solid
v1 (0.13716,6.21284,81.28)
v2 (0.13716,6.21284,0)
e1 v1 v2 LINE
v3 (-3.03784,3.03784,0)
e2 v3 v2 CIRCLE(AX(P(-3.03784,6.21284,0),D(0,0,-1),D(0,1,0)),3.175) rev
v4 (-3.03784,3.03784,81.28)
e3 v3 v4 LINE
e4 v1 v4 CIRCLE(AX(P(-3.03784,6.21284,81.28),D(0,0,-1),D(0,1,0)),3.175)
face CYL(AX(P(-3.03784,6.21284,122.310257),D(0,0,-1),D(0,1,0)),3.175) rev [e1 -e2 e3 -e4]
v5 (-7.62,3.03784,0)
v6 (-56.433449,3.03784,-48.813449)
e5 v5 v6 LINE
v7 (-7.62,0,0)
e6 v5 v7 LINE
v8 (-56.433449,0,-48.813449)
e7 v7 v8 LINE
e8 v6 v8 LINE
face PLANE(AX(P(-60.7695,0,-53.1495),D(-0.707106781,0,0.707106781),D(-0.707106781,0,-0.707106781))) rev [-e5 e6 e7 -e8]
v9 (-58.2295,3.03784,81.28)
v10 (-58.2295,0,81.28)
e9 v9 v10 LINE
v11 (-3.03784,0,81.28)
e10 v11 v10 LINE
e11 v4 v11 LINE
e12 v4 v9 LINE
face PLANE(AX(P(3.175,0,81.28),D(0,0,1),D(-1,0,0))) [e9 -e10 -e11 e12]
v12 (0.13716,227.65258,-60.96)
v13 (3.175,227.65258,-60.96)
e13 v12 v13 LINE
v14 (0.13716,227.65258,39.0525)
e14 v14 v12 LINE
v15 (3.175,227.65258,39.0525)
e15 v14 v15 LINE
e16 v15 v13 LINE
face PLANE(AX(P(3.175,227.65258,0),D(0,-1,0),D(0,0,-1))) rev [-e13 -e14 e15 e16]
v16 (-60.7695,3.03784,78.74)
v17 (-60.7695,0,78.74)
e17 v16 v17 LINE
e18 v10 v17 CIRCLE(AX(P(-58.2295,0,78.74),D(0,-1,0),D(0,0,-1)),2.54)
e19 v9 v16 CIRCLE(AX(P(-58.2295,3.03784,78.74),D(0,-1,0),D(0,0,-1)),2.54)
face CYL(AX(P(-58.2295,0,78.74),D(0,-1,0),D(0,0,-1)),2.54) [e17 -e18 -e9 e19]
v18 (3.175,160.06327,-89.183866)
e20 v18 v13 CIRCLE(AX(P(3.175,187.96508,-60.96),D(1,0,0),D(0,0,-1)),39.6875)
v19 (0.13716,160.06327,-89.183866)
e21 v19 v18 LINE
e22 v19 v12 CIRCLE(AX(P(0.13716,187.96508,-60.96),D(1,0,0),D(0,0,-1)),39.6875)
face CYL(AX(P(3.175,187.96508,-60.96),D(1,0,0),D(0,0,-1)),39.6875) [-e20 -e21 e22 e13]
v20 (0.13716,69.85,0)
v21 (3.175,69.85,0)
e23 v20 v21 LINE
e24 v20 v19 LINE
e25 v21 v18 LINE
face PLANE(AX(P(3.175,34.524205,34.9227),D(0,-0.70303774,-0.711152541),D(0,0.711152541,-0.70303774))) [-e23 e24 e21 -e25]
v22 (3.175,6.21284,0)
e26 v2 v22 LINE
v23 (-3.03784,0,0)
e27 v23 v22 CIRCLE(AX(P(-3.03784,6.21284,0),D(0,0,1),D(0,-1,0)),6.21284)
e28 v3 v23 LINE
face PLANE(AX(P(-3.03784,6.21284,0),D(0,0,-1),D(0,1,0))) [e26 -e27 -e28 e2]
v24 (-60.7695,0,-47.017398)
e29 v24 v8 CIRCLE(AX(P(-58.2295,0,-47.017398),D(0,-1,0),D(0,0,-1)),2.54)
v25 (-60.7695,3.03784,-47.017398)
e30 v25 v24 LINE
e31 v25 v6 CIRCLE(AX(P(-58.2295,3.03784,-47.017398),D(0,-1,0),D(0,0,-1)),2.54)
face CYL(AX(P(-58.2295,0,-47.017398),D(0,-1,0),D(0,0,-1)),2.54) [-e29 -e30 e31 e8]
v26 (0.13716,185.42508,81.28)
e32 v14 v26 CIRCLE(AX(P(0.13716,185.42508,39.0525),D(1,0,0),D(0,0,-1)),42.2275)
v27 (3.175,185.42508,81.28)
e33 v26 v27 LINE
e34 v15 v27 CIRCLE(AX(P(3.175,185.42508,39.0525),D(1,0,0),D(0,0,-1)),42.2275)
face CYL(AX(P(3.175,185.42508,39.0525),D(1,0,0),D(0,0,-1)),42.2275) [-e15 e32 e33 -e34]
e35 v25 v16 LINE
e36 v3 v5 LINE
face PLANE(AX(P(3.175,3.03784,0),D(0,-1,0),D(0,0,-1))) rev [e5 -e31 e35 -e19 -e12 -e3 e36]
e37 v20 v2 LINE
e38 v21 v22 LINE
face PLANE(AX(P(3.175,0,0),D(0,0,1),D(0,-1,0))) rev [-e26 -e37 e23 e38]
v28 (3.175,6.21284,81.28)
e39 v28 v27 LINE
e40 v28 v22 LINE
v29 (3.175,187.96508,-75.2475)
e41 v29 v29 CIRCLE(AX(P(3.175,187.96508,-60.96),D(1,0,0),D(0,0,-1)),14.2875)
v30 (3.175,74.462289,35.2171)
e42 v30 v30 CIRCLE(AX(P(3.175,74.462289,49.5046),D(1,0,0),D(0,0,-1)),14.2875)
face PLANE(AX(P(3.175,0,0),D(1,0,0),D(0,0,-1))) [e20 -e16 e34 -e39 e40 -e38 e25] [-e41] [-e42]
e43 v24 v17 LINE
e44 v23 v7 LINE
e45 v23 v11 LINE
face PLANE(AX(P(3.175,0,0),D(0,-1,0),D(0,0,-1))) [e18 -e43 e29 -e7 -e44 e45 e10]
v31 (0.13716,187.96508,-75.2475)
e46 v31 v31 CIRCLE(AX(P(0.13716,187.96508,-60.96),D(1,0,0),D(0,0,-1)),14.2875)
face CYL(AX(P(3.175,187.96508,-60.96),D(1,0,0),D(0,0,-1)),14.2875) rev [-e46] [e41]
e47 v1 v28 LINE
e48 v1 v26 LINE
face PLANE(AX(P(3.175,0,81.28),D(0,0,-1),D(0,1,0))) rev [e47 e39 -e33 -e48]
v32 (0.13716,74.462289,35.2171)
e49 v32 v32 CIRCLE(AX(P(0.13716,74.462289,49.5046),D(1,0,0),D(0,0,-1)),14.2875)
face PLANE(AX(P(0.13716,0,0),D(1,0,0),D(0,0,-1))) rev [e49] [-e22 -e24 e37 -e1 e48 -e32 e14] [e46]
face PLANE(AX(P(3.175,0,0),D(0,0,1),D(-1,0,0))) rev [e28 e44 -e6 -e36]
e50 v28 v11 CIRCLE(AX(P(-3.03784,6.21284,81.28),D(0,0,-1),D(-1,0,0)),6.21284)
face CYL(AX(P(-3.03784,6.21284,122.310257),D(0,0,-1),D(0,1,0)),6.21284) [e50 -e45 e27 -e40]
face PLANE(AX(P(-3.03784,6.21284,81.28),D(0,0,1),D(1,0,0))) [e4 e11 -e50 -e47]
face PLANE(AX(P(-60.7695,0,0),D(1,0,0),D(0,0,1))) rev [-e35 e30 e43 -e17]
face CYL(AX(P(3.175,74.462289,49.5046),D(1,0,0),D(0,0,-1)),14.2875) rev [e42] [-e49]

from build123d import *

# Parameters (mm, degrees)
SKETCH2_R              = 14.2875
SKETCH2_W              = 81.28
SKETCH2_H              = 3.175
BOSS_EXTRUDE1_DEPTH    = 3.175
SKETCH9_R              = 14.2875
CUT_EXTRUDE2_DEPTH     = 3.175
SKETCH2_3_W            = 81.28
SKETCH2_3_H            = 3.175
BOSS_EXTRUDE2_DEPTH    = 60.7695
BOSS_EXTRUDE3_DEPTH    = 3.175
FILLET1_R              = 2.54
FILLET2_R              = 42.2275
CONVERT_SOLID2_START   = -102
CONVERT_SOLID2_DEPTH   = 184
CONVERT_SOLID2_2_DEPTH = 81.28
UNFOLD1_START          = -51
UNFOLD1_DEPTH          = 132.28
UNFOLD1_2_DEPTH        = 78.74
UNFOLD1_START_2        = 0.13716
UNFOLD1_3_DEPTH        = 3.03784
FOLD1_START            = -58.892012294
FOLD1_OUTLINE_W        = 3.03784
FOLD1_OUTLINE_H        = 81.28
FOLD1_DEPTH            = 59.530319476
FOLD1_2_DEPTH          = 6.21284
FOLD1_START_2          = -49.557397552
FOLD1_3_DEPTH          = 131.557397552


with BuildPart() as part:
    # Sketch2 → Boss-Extrude1 (new body)
    # profile 1 of 2: a face of its own
    with BuildSketch(Plane(origin=(0, 0, 0), x_dir=(0, 0, -1), z_dir=(1, 0, 0))):
        with BuildLine():
            Line((0, 3.175), (0, 69.85))
            Line((0, 69.85), (89.183866464, 160.063269699))
            ThreePointArc((89.183866464, 160.063269699), (97.582743975, 203.257963311), (60.96, 227.65258))
            Line((60.96, 227.65258), (-81.28, 227.65258))
            Line((-81.28, 227.65258), (-81.28, 69.85))
            Line((-81.28, 69.85), (-81.28, 3.175))
            Line((-81.28, 3.175), (0, 3.175))
        make_face()
        with Locations((60.96, 187.96508)):
            Circle(SKETCH2_R, mode=Mode.SUBTRACT)
    # profile 2 of 2: a face of its own
    with BuildSketch(Plane(origin=(0, 0, 0), x_dir=(0, 0, -1), z_dir=(1, 0, 0))):
        with Locations((-40.64, 1.5875)):
            Rectangle(SKETCH2_W, SKETCH2_H)
    extrude(amount=BOSS_EXTRUDE1_DEPTH)

    # Sketch9 → Cut-Extrude2 (cut)
    with BuildSketch(Plane(origin=(0, 0, 0), x_dir=(0, 0, -1), z_dir=(1, 0, 0))):
        with Locations((-49.5046, 74.46228868)):
            Circle(SKETCH9_R)
    extrude(amount=CUT_EXTRUDE2_DEPTH, mode=Mode.SUBTRACT)

    # Sketch2<3> → Boss-Extrude2 (add)
    with BuildSketch(Plane(origin=(0, 0, 0), x_dir=(0, 0, -1), z_dir=(1, 0, 0))):
        with Locations((-40.64, 1.5875)):
            Rectangle(SKETCH2_3_W, SKETCH2_3_H)
    extrude(amount=-BOSS_EXTRUDE2_DEPTH)

    # Sketch3 → Boss-Extrude3 (add)
    with BuildSketch(Plane(origin=(0, 3.175, 0), x_dir=(1, 0, 0), z_dir=(0, 1, 0))):
        Polygon((-60.7695, 0), (-60.7695, 53.1495), (-7.62, 0), align=None)
    extrude(amount=-BOSS_EXTRUDE3_DEPTH)

    # Fillet1
    fillet1_edges = [part.edges().sort_by_distance(p)[0] for p in [
        (-60.7695, 1.5875, 81.28),
        (-60.7695, 1.5875, -53.1495),
    ]]
    fillet(fillet1_edges, radius=FILLET1_R)

    # Fillet2
    fillet2_edges = [part.edges().sort_by_distance(p)[0] for p in [
        (1.5875, 227.65258, 81.28),
    ]]
    fillet(fillet2_edges, radius=FILLET2_R)

    # Convert-Solid2: read off the stored shape, not the designer's step
    # Convert-Solid2 outline → Convert-Solid2 (cut)
    with BuildSketch(Plane.XY.offset(CONVERT_SOLID2_START)):
        with BuildLine():
            ThreePointArc((3.175, 6.21284), (1.355301294, 1.819698706), (-3.03784, 0))
            Line((-3.03784, 0), (3.175, 0))
            Line((3.175, 0), (3.175, 6.21284))
        make_face()
        with BuildLine():
            Line((-60.7695, 3.175), (-60.7695, 3.03784))
            Line((-60.7695, 3.03784), (-3.03784, 3.03784))
            ThreePointArc((-3.03784, 3.03784), (-2.571212204, 3.072317193), (-2.114718593, 3.175))
            Line((-2.114718593, 3.175), (-60.7695, 3.175))
        make_face()
        with BuildLine():
            Line((0.13716, 6.21284), (0.13716, 227.65258))
            Line((0.13716, 227.65258), (0, 227.65258))
            Line((0, 227.65258), (0, 5.289718593))
            ThreePointArc((0, 5.289718593), (0.102682807, 5.746212204), (0.13716, 6.21284))
        make_face()
    extrude(amount=CONVERT_SOLID2_DEPTH, mode=Mode.SUBTRACT)

    # Convert-Solid2 2 outline → Convert-Solid2 2 (add)
    with BuildSketch(Plane.XY):
        with BuildLine():
            ThreePointArc((0, 5.289718593), (-0.79277597, 3.96777597), (-2.114718593, 3.175))
            Line((-2.114718593, 3.175), (0, 3.175))
            Line((0, 3.175), (0, 5.289718593))
        make_face()
    extrude(amount=CONVERT_SOLID2_2_DEPTH)

    # Unfold1: read off the stored shape, not the designer's step
    # Unfold1 outline → Unfold1 (cut)
    with BuildSketch(Plane.XY.offset(UNFOLD1_START)):
        with BuildLine():
            ThreePointArc((-3.03784, 0), (-1.391483498, 0.222106228), (0.13716, 0.872544516))
            Line((0.13716, 0.872544516), (0.13716, 6.21284))
            ThreePointArc((0.13716, 6.21284), (-0.79277597, 3.96777597), (-3.03784, 3.03784))
            Line((-3.03784, 3.03784), (-60.7695, 3.03784))
            Line((-60.7695, 3.03784), (-60.7695, 0))
            Line((-60.7695, 0), (-3.03784, 0))
        make_face()
    extrude(amount=UNFOLD1_DEPTH, mode=Mode.SUBTRACT)

    # Unfold1 2 outline → Unfold1 2 (add)
    with BuildSketch(Plane.XY):
        with BuildLine():
            Line((0.13716, -58.892012294), (3.175, -58.892012294))
            Line((3.175, -58.892012294), (3.175, 6.21284))
            ThreePointArc((3.175, 6.21284), (2.362398322, 3.140901373), (0.13716, 0.872544516))
            Line((0.13716, 0.872544516), (0.13716, -58.892012294))
        make_face()
    extrude(amount=UNFOLD1_2_DEPTH)

    # Unfold1 3 outline → Unfold1 3 (add)
    with BuildSketch(Plane.YZ.offset(UNFOLD1_START_2)):
        with BuildLine():
            Line((8, 81.28), (-56.352012294, 81.28))
            ThreePointArc((-56.352012294, 81.28), (-58.148063518, 80.536051224), (-58.892012294, 78.74))
            Line((-58.892012294, 78.74), (8, 78.74))
            Line((8, 78.74), (8, 81.28))
        make_face()
        with BuildLine():
            Line((-5.742512294, 0), (-58.892012294, 0))
            Line((-58.892012294, 0), (-58.892012294, -47.017397552))
            ThreePointArc((-58.892012294, -47.017397552), (-57.324028212, -49.364051564), (-54.55596107, -48.813448776))
            Line((-54.55596107, -48.813448776), (-5.742512294, 0))
        make_face()
    extrude(amount=UNFOLD1_3_DEPTH)

    # Fold1: read off the stored shape, not the designer's step
    # Fold1 outline → Fold1 (cut)
    with BuildSketch(Plane(origin=(0, 0, 0), x_dir=(1, 0, 0), z_dir=(0, 1, 0)).offset(FOLD1_START)):
        with Locations((1.65608, -40.64)):
            Rectangle(FOLD1_OUTLINE_W, FOLD1_OUTLINE_H)
    extrude(amount=FOLD1_DEPTH, mode=Mode.SUBTRACT)

    # Fold1 2 outline → Fold1 2 (add)
    with BuildSketch(Plane(origin=(0, 0, 0), x_dir=(1, 0, 0), z_dir=(0, 1, 0))):
        with BuildLine():
            ThreePointArc((-60.7695, -78.74), (-60.025551224, -80.536051224), (-58.2295, -81.28))
            Line((-58.2295, -81.28), (0.13716, -81.28))
            Line((0.13716, -81.28), (0.13716, 0))
            Line((0.13716, 0), (-7.62, 0))
            Line((-7.62, 0), (-56.433448776, 48.813448776))
            ThreePointArc((-56.433448776, 48.813448776), (-59.201515918, 49.364051564), (-60.7695, 47.017397552))
            Line((-60.7695, 47.017397552), (-60.7695, -78.74))
        make_face()
    extrude(amount=FOLD1_2_DEPTH)

    # Fold1 3 outline → Fold1 3 (cut)
    with BuildSketch(Plane.XY.offset(FOLD1_START_2)):
        with BuildLine():
            Line((-60.7695, 6.21284), (-60.7695, 3.03784))
            Line((-60.7695, 3.03784), (-3.03784, 3.03784))
            ThreePointArc((-3.03784, 3.03784), (-0.79277597, 3.96777597), (0.13716, 6.21284))
            Line((0.13716, 6.21284), (-60.7695, 6.21284))
        make_face()
        with BuildLine():
            Line((-3.03784, 0), (-60.7695, -1.4e-08))
            Line((-60.7695, -1.4e-08), (-60.7695, -60))
            Line((-60.7695, -60), (0.13716, -60))
            Line((0.13716, -60), (0.13716, -58.892012294))
            Line((0.13716, -58.892012294), (3.175, -58.892012294))
            Line((3.175, -58.892012294), (3.175, 6.21284))
            ThreePointArc((3.175, 6.21284), (1.355301294, 1.819698706), (-3.03784, 0))
        make_face()
    extrude(amount=FOLD1_3_DEPTH, mode=Mode.SUBTRACT)


solid = part.part
